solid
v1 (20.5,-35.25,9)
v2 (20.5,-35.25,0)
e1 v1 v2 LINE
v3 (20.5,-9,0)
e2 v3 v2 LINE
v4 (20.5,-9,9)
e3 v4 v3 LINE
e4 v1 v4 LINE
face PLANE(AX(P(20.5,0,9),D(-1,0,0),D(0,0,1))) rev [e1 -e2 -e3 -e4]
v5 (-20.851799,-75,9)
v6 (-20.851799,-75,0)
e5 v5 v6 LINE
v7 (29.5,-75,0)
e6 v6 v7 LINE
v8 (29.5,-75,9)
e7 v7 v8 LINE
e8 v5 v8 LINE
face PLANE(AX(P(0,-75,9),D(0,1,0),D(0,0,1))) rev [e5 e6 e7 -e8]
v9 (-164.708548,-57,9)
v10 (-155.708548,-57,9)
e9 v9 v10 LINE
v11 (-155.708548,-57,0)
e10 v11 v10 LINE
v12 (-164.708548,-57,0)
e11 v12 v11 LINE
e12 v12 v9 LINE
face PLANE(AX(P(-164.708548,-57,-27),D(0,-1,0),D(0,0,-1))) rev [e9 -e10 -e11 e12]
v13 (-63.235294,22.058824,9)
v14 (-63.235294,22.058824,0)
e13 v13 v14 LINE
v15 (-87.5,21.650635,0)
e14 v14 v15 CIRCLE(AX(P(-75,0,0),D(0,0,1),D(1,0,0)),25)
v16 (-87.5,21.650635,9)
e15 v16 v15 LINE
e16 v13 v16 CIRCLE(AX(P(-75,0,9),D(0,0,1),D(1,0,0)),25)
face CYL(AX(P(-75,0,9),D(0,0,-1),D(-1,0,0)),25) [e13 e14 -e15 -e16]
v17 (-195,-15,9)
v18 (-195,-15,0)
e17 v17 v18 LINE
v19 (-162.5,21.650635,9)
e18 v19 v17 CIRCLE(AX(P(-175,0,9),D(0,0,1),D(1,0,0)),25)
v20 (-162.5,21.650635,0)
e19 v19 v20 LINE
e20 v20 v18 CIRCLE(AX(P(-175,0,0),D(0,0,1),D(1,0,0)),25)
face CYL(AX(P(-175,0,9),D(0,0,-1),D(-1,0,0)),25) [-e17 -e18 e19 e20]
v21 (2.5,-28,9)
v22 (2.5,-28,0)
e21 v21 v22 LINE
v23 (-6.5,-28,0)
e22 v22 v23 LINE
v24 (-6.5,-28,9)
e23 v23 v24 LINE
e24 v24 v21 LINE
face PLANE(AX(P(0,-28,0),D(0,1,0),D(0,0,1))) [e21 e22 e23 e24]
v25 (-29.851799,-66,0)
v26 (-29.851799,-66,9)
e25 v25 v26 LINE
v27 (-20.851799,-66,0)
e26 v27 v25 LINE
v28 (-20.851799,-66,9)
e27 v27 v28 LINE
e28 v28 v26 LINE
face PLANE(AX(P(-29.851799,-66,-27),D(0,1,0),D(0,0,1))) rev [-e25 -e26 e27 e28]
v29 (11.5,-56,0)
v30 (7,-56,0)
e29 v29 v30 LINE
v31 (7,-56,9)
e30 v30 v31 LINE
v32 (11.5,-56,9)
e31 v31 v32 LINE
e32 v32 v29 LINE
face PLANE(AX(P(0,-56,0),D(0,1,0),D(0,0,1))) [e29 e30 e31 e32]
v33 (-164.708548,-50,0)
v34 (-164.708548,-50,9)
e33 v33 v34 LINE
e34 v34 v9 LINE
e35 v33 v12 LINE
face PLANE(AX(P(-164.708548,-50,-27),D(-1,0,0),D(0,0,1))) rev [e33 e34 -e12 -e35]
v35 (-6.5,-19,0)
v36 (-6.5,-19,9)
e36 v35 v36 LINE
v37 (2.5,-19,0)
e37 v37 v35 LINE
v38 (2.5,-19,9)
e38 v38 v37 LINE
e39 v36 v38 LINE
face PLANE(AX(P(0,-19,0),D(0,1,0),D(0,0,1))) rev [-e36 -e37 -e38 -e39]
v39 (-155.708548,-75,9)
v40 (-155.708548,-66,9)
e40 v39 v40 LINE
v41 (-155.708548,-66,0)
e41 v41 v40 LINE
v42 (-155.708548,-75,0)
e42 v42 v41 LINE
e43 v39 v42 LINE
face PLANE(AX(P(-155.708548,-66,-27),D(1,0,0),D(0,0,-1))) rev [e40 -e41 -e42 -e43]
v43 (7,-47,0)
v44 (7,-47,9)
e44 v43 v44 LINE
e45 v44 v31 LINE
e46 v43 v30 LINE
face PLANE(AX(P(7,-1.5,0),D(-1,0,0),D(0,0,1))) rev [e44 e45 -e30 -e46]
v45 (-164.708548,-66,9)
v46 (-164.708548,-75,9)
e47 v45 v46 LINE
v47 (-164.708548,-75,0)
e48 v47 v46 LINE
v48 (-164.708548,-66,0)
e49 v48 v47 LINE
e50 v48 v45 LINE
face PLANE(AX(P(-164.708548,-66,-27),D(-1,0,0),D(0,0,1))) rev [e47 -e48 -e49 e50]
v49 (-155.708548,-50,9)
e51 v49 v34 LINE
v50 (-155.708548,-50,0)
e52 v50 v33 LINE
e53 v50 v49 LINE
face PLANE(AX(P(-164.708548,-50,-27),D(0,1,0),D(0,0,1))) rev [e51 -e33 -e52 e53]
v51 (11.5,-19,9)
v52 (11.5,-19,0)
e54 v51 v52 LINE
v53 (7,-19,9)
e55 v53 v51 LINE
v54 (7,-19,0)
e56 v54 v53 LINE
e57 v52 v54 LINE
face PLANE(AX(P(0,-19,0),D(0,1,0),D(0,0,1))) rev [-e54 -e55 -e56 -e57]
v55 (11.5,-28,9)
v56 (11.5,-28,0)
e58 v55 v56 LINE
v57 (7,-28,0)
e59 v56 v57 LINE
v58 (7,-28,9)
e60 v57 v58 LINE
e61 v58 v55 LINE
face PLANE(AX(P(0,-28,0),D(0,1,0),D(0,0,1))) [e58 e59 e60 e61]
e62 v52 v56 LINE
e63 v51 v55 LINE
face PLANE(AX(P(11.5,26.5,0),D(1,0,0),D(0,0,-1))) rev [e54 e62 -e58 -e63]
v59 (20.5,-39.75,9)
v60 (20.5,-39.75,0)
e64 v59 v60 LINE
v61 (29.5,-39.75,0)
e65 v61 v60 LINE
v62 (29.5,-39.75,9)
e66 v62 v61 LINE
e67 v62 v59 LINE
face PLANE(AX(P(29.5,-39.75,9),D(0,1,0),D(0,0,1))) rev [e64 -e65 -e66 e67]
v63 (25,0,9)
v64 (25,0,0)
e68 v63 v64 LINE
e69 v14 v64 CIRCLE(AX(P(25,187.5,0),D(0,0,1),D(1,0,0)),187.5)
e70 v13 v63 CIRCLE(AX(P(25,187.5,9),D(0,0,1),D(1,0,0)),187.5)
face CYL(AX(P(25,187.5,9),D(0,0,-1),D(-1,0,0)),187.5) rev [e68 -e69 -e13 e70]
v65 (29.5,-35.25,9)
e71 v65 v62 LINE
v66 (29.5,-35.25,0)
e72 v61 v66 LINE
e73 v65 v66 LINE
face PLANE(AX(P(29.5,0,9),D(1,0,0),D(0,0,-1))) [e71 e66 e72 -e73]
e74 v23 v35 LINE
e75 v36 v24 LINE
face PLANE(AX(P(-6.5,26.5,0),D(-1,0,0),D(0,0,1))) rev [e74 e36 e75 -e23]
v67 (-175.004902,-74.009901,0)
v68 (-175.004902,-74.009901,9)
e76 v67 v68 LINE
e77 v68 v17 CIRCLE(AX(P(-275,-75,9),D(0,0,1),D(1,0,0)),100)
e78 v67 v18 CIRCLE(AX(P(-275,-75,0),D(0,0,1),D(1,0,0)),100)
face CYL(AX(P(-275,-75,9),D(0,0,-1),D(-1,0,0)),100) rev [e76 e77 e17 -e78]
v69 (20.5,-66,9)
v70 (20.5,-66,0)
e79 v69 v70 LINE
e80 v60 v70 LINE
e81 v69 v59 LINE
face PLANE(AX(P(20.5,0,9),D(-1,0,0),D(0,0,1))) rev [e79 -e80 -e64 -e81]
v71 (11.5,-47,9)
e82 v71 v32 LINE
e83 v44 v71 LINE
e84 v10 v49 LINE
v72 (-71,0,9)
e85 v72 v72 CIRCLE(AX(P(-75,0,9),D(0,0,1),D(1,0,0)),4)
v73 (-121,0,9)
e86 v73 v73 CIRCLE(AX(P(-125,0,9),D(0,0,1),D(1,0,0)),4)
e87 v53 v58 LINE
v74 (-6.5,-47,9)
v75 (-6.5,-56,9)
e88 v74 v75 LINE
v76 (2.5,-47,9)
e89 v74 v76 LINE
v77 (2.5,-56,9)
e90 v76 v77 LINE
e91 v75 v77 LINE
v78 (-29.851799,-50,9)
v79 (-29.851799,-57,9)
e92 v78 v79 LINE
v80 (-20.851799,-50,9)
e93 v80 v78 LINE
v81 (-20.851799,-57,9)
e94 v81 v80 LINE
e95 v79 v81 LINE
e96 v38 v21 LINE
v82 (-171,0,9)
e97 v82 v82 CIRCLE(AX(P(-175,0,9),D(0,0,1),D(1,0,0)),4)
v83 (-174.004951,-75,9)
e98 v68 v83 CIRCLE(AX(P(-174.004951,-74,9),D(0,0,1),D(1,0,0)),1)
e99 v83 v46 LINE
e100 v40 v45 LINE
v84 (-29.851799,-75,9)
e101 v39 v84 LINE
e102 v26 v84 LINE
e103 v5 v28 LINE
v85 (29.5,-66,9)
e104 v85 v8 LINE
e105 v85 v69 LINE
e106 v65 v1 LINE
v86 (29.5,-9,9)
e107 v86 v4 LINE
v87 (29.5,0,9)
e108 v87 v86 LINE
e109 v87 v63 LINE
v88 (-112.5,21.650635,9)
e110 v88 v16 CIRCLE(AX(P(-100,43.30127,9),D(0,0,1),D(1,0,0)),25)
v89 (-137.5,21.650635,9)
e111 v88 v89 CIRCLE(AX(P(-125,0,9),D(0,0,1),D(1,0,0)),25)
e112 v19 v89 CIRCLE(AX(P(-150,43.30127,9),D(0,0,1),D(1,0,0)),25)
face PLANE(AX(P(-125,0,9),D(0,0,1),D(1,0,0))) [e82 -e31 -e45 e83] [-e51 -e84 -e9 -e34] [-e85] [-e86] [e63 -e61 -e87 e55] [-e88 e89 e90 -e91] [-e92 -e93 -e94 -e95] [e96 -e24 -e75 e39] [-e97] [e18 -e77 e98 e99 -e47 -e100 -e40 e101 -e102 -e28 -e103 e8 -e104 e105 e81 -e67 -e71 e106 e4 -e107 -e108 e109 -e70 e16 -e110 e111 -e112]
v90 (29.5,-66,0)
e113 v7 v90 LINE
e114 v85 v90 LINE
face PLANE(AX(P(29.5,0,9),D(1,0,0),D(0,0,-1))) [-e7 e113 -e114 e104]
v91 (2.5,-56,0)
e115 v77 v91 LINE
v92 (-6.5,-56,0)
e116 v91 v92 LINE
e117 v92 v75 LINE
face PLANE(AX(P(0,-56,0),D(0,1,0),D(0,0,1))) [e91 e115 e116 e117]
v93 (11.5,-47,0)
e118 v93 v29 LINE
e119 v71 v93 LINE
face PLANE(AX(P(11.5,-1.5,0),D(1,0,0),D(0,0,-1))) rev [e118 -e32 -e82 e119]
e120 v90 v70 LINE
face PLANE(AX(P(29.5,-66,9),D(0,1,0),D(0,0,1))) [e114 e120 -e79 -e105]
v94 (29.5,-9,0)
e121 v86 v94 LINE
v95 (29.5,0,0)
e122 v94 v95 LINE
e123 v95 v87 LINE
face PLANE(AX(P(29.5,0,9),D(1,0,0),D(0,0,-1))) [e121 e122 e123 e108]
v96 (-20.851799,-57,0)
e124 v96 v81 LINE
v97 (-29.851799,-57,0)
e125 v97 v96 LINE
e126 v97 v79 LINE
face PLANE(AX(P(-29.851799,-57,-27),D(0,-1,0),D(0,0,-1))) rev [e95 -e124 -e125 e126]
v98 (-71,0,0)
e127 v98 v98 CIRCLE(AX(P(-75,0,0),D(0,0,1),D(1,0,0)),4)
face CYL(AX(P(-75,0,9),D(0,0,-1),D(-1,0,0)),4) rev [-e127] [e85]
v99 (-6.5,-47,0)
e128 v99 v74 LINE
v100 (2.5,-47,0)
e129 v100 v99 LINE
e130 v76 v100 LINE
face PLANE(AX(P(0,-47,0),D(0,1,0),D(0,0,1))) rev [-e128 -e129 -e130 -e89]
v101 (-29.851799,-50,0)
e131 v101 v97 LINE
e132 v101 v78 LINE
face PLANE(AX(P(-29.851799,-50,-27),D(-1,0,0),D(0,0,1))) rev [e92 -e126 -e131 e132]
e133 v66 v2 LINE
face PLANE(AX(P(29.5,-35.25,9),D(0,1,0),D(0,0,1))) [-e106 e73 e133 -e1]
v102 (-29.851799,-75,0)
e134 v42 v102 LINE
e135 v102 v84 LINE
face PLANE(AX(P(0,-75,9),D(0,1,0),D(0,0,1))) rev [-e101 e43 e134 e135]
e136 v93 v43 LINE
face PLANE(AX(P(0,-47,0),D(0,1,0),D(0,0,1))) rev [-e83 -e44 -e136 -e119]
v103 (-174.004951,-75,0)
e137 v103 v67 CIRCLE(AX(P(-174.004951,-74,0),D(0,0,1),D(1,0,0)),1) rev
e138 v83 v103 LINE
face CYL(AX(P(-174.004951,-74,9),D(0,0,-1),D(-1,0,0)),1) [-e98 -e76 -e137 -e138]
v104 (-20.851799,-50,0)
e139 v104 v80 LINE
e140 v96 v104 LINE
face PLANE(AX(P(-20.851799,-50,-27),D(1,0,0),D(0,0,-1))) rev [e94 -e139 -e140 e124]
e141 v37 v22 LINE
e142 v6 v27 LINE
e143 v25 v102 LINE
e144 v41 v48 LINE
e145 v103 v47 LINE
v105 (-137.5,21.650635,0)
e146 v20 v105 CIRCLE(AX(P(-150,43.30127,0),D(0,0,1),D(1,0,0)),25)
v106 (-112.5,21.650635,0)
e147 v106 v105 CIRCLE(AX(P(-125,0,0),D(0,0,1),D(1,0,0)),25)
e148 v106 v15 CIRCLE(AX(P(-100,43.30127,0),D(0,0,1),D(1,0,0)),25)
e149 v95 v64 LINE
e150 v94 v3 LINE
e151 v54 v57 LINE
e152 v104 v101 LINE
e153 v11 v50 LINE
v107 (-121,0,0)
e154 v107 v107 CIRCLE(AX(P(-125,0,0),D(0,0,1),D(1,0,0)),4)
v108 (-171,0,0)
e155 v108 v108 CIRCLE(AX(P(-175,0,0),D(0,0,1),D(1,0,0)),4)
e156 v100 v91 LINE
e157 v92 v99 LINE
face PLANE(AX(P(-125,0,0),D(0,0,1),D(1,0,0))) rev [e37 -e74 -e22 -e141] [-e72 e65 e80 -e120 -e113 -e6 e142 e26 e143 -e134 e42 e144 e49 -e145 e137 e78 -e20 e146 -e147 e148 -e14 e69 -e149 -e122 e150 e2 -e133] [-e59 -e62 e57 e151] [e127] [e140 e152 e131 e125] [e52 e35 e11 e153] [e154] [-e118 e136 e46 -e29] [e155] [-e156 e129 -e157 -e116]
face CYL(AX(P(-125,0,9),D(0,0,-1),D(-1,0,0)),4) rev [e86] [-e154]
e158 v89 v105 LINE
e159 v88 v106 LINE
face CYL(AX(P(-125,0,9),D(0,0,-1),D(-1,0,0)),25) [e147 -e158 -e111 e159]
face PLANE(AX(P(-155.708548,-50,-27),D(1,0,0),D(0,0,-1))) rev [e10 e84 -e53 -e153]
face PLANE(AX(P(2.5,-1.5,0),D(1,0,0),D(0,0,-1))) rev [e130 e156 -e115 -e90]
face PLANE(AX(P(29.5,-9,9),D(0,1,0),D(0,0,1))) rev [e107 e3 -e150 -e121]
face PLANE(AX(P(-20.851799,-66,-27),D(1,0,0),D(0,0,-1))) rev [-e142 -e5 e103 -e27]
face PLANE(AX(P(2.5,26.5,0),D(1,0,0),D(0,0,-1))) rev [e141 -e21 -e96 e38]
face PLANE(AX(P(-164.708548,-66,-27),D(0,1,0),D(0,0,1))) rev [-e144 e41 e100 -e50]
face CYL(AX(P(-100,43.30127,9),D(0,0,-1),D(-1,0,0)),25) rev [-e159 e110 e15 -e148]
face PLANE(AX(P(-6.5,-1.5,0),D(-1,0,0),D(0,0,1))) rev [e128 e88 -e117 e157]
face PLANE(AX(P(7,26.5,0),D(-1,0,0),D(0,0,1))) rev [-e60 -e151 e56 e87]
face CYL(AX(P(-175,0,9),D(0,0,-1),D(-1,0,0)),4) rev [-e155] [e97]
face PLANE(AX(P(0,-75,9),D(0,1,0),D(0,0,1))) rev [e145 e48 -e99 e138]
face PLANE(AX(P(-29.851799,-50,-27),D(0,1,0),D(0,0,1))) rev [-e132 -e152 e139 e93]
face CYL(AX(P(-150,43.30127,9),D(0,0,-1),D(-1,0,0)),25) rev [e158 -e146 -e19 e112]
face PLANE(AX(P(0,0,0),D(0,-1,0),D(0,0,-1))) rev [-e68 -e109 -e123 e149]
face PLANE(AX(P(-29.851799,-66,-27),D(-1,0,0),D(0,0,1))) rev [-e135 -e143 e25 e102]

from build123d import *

# Parameters (mm, degrees)
SKETCH1_R                = 8
SKETCH1_R_2              = 4
BOSS_EXTRUDE1_DEPTH      = 9
BOSS_EXTRUDE1_2_DEPTH    = 9
SKETCH2_R                = 4
BOSS_EXTRUDE3_DEPTH      = 9
FILLET1_R                = 1
CUT_EXTRUDE1_DEPTH       = 214.789616212
SKETCH4_W                = 9
SKETCH4_H                = 27
BOSS_EXTRUDE4_DEPTH      = 75
BOSS_EXTRUDE5_START      = 9
SKETCH5_R                = 25
SKETCH5_R_2              = 4
BOSS_EXTRUDE5_DEPTH      = 9
BOSS_EXTRUDE6_DEPTH      = 4.5
BOSS_EXTRUDE6_DEPTH_BACK = 4.5
BOSS_EXTRUDE7_DEPTH      = 4.5
BOSS_EXTRUDE7_DEPTH_BACK = 4.5
BOSS_EXTRUDE7_START      = -25
SKETCH9_W                = 9
SKETCH9_H                = 7
SKETCH9_H_2              = 9
CUT_EXTRUDE2_DEPTH       = 217.612557346
CUT_EXTRUDE3_DEPTH       = 216.299790989
CUT_EXTRUDE3_DEPTH_BACK  = 216.299790989
CAVITY1_START            = -66
CAVITY1_OUTLINE_W        = 9
CAVITY1_OUTLINE_H        = 9
CAVITY1_DEPTH            = 26.25
CAVITY1_START_2          = -35.25
CAVITY1_2_OUTLINE_W      = 9
CAVITY1_2_OUTLINE_H      = 9
CAVITY1_2_DEPTH          = 26.25
CAVITY1_START_3          = -56
CAVITY1_3_OUTLINE_W      = 4.5
CAVITY1_3_OUTLINE_H      = 9
CAVITY1_3_OUTLINE_W_2    = 9
CAVITY1_3_DEPTH          = 9
CAVITY1_START_4          = -28
CAVITY1_4_OUTLINE_W      = 4.5
CAVITY1_4_OUTLINE_H      = 9
CAVITY1_4_OUTLINE_W_2    = 9
CAVITY1_4_DEPTH          = 9


# Read off the part's stored shape, not the designer's step: Cavity1
with BuildPart() as part:
    # Sketch1 → Boss-Extrude1 (new body)
    with BuildSketch(Plane.XY):
        with Locations((-125, 0)):
            Circle(SKETCH1_R)
        with Locations((-125, 0)):
            Circle(SKETCH1_R_2, mode=Mode.SUBTRACT)
    extrude(amount=BOSS_EXTRUDE1_DEPTH)



with BuildPart() as body_2:
    # Sketch1 → Boss-Extrude1 2 (new body)
    with BuildSketch(Plane.XY):
        with Locations((125, 0)):
            Circle(SKETCH1_R)
        with Locations((125, 0)):
            Circle(SKETCH1_R_2, mode=Mode.SUBTRACT)
    extrude(amount=BOSS_EXTRUDE1_2_DEPTH)


with BuildPart() as part_1:
    add(part.part)

    add(body_2.part)  # Boss-Extrude3 merges body 2
    # Sketch2 → Boss-Extrude3 (add)
    with BuildSketch(Plane.XY):
        with BuildLine():
            Line((-175, -75), (125, -75))
            ThreePointArc((125, -75), (130.131670325, -43.377223009), (145.000000492, -14.999999344))
            ThreePointArc((145.000000492, -14.999999344), (143.981414944, 16.269784471), (113.235294528, 22.058823748))
            ThreePointArc((113.235294528, 22.058823748), (25.000000075, 0), (-63.235294395, 22.058823677))
            ThreePointArc((-63.235294395, 22.058823677), (-75.420498385, 24.996463372), (-87.499999896, 21.650635154))
            ThreePointArc((-87.499999896, 21.650635154), (-99.999999954, 18.301270189), (-112.500000024, 21.650635108))
            ThreePointArc((-112.500000024, 21.650635108), (-124.99999995, 25), (-137.49999989, 21.650635158))
            ThreePointArc((-137.49999989, 21.650635158), (-149.999999954, 18.301270189), (-162.50000003, 21.650635112))
            ThreePointArc((-162.50000003, 21.650635112), (-193.705072901, 16.586749162), (-195.000000551, -14.999999265))
            ThreePointArc((-195.000000551, -14.999999265), (-180.13167034, -43.377222962), (-175, -75))
        make_face()
        with Locations((125, 0)):
            Circle(SKETCH2_R, mode=Mode.SUBTRACT)
        with Locations((-175, 0)):
            Circle(SKETCH2_R, mode=Mode.SUBTRACT)
        with Locations((-125, 0)):
            Circle(SKETCH2_R, mode=Mode.SUBTRACT)
        with Locations((-75, 0)):
            Circle(SKETCH2_R, mode=Mode.SUBTRACT)
    extrude(amount=BOSS_EXTRUDE3_DEPTH)

    # Fillet1
    fillet1_edges = [part_1.edges().sort_by_distance(p)[0] for p in [
        (-175, -75, 4.5),
        (125, -75, 4.5),
    ]]
    fillet(fillet1_edges, radius=FILLET1_R)

    # Sketch3 → Cut-Extrude1 (cut, through all)
    with BuildSketch(Plane.XY):
        Polygon((25, 0), (25, -75), (150, -75), (150, 25), (25, 25), align=None)
    extrude(amount=CUT_EXTRUDE1_DEPTH, mode=Mode.SUBTRACT)

    # Sketch4 → Boss-Extrude4 (add)
    with BuildSketch(Plane.XZ.offset(75)):
        with Locations((25, -4.5)):
            Rectangle(SKETCH4_W, SKETCH4_H)
    extrude(amount=-BOSS_EXTRUDE4_DEPTH)

    # Sketch5 → Boss-Extrude5 (add)
    # profile 1 of 4: a face of its own
    with BuildSketch(Plane(origin=(0, 0, -18), x_dir=(-1, 0, 0), z_dir=(0, 0, -1)).offset(BOSS_EXTRUDE5_START)):
        with BuildLine():
            ThreePointArc((-145.000000304, -14.999999594), (-130.131670275, -43.377223158), (-125, -75))
            Line((-125, -75), (-29.5, -75))
            Line((-29.5, -75), (-29.5, 0))
            Line((-29.5, 0), (-100, 0))
            ThreePointArc((-100, 0), (-117.09430609, -23.717082532), (-145.000000304, -14.999999594))
        make_face()
    # profile 2 of 4: a face of its own
    with BuildSketch(Plane(origin=(0, 0, -18), x_dir=(-1, 0, 0), z_dir=(0, 0, -1)).offset(BOSS_EXTRUDE5_START)):
        with Locations((-125, 0)):
            Circle(SKETCH5_R)
        with Locations((-125, 0)):
            Circle(SKETCH5_R_2, mode=Mode.SUBTRACT)
    # profile 3 of 4: a face of its own
    with BuildSketch(Plane(origin=(0, 0, -18), x_dir=(-1, 0, 0), z_dir=(0, 0, -1)).offset(BOSS_EXTRUDE5_START)):
        Polygon((-29.5, 0), (-29.5, -75), (-20.5, -75), (-20.5, 0), (-25, 0), align=None)
    # profile 4 of 4: a face of its own
    with BuildSketch(Plane(origin=(0, 0, -18), x_dir=(-1, 0, 0), z_dir=(0, 0, -1)).offset(BOSS_EXTRUDE5_START)):
        with BuildLine():
            Line((-100, 0), (-29.5, 0))
            Line((-29.5, 0), (-25, 0))
            ThreePointArc((-25, 0), (-70.475429529, 5.598281181), (-113.235293817, 22.058823369))
            ThreePointArc((-113.235293817, 22.058823369), (-103.56267677, 12.86239374), (-100, 0))
        make_face()
    extrude(amount=-BOSS_EXTRUDE5_DEPTH)

    # Sketch7 → Boss-Extrude6 (add, two sides: drawn at the far end of the back side and taken through both)
    with BuildSketch(Plane(origin=(0, -25, 0), x_dir=(1, 0, 0), z_dir=(0, 1, 0)).offset(-BOSS_EXTRUDE6_DEPTH_BACK)):
        with BuildLine():
            Line((56.5, 18), (29.5, 18))
            Line((29.5, 18), (29.5, -9))
            ThreePointArc((29.5, -9), (48.591883092, -1.091883092), (56.5, 18))
        make_face()
        with BuildLine():
            Line((-6.5, 0), (20.5, 0))
            Line((20.5, 0), (20.5, 27))
            ThreePointArc((20.5, 27), (1.408116908, 19.091883092), (-6.5, 0))
        make_face()
    extrude(amount=BOSS_EXTRUDE6_DEPTH + BOSS_EXTRUDE6_DEPTH_BACK)

    # Sketch7<3> → Boss-Extrude7 (add, two sides: drawn at the far end of the back side and taken through both)
    with BuildSketch(Plane(origin=(0, -25, 0), x_dir=(1, 0, 0), z_dir=(0, 1, 0)).offset(BOSS_EXTRUDE7_START - BOSS_EXTRUDE7_DEPTH_BACK)):
        with BuildLine():
            Line((56.5, 18), (29.5, 18))
            Line((29.5, 18), (29.5, -9))
            ThreePointArc((29.5, -9), (48.591883092, -1.091883092), (56.5, 18))
        make_face()
        with BuildLine():
            Line((-6.5, 0), (20.5, 0))
            Line((20.5, 0), (20.5, 27))
            ThreePointArc((20.5, 27), (1.408116908, 19.091883092), (-6.5, 0))
        make_face()
    extrude(amount=BOSS_EXTRUDE7_DEPTH + BOSS_EXTRUDE7_DEPTH_BACK)

    # Sketch9 → Cut-Extrude2 (cut, through all)
    with BuildSketch(Plane.XY.offset(9)):
        with Locations((-160.208548161, -53.5)):
            Rectangle(SKETCH9_W, SKETCH9_H)
        with Locations((-160.208548161, -70.5)):
            Rectangle(SKETCH9_W, SKETCH9_H_2)
        with Locations((-25.351798772, -53.5)):
            Rectangle(SKETCH9_W, SKETCH9_H)
        with Locations((-25.351798772, -70.5)):
            Rectangle(SKETCH9_W, SKETCH9_H_2)
        with Locations((109.504950616, -53.5)):
            Rectangle(SKETCH9_W, SKETCH9_H)
        with Locations((109.504950616, -70.5)):
            Rectangle(SKETCH9_W, SKETCH9_H_2)
    extrude(amount=-CUT_EXTRUDE2_DEPTH, mode=Mode.SUBTRACT)

    # Sketch10 → Cut-Extrude3 (cut, two sides: drawn at the far end of the back side and taken through both)
    with BuildSketch(Plane(origin=(0, 0, 0), x_dir=(1, 0, 0), z_dir=(0, 1, 0)).offset(-CUT_EXTRUDE3_DEPTH_BACK)):
        Polygon((-200, 27), (-200, 0), (29.5, 0), (29.5, -9), (150, -9), (150, 18), (20.5, 18), (20.5, 27), align=None)
    extrude(amount=CUT_EXTRUDE3_DEPTH + CUT_EXTRUDE3_DEPTH_BACK, mode=Mode.SUBTRACT)


with BuildPart() as cut_extrude3_kept_piece:
    # of the separate pieces the step leaves, the one the design keeps (cut_extrude3_pieces_kept)
    add(part_1.part.solids().sort_by_distance((-175.0049016, -74.00990099, 0))[0])

    # Cavity1 outline → Cavity1 (cut)
    with BuildSketch(Plane(origin=(0, 0, 0), x_dir=(1, 0, 0), z_dir=(0, 1, 0)).offset(CAVITY1_START)):
        with Locations((25, -4.5)):
            Rectangle(CAVITY1_OUTLINE_W, CAVITY1_OUTLINE_H)
    extrude(amount=CAVITY1_DEPTH, mode=Mode.SUBTRACT)

    # Cavity1 2 outline → Cavity1 2 (cut)
    with BuildSketch(Plane(origin=(0, 0, 0), x_dir=(1, 0, 0), z_dir=(0, 1, 0)).offset(CAVITY1_START_2)):
        with Locations((25, -4.5)):
            Rectangle(CAVITY1_2_OUTLINE_W, CAVITY1_2_OUTLINE_H)
    extrude(amount=CAVITY1_2_DEPTH, mode=Mode.SUBTRACT)

    # Cavity1 3 outline → Cavity1 3 (cut)
    with BuildSketch(Plane(origin=(0, 0, 0), x_dir=(1, 0, 0), z_dir=(0, 1, 0)).offset(CAVITY1_START_3)):
        with Locations((9.25, -4.5)):
            Rectangle(CAVITY1_3_OUTLINE_W, CAVITY1_3_OUTLINE_H)
        with Locations((-2, -4.5)):
            Rectangle(CAVITY1_3_OUTLINE_W_2, CAVITY1_3_OUTLINE_H)
    extrude(amount=CAVITY1_3_DEPTH, mode=Mode.SUBTRACT)

    # Cavity1 4 outline → Cavity1 4 (cut)
    with BuildSketch(Plane(origin=(0, 0, 0), x_dir=(1, 0, 0), z_dir=(0, 1, 0)).offset(CAVITY1_START_4)):
        with Locations((9.25, -4.5)):
            Rectangle(CAVITY1_4_OUTLINE_W, CAVITY1_4_OUTLINE_H)
        with Locations((-2, -4.5)):
            Rectangle(CAVITY1_4_OUTLINE_W_2, CAVITY1_4_OUTLINE_H)
    extrude(amount=CAVITY1_4_DEPTH, mode=Mode.SUBTRACT)


solid = cut_extrude3_kept_piece.part
